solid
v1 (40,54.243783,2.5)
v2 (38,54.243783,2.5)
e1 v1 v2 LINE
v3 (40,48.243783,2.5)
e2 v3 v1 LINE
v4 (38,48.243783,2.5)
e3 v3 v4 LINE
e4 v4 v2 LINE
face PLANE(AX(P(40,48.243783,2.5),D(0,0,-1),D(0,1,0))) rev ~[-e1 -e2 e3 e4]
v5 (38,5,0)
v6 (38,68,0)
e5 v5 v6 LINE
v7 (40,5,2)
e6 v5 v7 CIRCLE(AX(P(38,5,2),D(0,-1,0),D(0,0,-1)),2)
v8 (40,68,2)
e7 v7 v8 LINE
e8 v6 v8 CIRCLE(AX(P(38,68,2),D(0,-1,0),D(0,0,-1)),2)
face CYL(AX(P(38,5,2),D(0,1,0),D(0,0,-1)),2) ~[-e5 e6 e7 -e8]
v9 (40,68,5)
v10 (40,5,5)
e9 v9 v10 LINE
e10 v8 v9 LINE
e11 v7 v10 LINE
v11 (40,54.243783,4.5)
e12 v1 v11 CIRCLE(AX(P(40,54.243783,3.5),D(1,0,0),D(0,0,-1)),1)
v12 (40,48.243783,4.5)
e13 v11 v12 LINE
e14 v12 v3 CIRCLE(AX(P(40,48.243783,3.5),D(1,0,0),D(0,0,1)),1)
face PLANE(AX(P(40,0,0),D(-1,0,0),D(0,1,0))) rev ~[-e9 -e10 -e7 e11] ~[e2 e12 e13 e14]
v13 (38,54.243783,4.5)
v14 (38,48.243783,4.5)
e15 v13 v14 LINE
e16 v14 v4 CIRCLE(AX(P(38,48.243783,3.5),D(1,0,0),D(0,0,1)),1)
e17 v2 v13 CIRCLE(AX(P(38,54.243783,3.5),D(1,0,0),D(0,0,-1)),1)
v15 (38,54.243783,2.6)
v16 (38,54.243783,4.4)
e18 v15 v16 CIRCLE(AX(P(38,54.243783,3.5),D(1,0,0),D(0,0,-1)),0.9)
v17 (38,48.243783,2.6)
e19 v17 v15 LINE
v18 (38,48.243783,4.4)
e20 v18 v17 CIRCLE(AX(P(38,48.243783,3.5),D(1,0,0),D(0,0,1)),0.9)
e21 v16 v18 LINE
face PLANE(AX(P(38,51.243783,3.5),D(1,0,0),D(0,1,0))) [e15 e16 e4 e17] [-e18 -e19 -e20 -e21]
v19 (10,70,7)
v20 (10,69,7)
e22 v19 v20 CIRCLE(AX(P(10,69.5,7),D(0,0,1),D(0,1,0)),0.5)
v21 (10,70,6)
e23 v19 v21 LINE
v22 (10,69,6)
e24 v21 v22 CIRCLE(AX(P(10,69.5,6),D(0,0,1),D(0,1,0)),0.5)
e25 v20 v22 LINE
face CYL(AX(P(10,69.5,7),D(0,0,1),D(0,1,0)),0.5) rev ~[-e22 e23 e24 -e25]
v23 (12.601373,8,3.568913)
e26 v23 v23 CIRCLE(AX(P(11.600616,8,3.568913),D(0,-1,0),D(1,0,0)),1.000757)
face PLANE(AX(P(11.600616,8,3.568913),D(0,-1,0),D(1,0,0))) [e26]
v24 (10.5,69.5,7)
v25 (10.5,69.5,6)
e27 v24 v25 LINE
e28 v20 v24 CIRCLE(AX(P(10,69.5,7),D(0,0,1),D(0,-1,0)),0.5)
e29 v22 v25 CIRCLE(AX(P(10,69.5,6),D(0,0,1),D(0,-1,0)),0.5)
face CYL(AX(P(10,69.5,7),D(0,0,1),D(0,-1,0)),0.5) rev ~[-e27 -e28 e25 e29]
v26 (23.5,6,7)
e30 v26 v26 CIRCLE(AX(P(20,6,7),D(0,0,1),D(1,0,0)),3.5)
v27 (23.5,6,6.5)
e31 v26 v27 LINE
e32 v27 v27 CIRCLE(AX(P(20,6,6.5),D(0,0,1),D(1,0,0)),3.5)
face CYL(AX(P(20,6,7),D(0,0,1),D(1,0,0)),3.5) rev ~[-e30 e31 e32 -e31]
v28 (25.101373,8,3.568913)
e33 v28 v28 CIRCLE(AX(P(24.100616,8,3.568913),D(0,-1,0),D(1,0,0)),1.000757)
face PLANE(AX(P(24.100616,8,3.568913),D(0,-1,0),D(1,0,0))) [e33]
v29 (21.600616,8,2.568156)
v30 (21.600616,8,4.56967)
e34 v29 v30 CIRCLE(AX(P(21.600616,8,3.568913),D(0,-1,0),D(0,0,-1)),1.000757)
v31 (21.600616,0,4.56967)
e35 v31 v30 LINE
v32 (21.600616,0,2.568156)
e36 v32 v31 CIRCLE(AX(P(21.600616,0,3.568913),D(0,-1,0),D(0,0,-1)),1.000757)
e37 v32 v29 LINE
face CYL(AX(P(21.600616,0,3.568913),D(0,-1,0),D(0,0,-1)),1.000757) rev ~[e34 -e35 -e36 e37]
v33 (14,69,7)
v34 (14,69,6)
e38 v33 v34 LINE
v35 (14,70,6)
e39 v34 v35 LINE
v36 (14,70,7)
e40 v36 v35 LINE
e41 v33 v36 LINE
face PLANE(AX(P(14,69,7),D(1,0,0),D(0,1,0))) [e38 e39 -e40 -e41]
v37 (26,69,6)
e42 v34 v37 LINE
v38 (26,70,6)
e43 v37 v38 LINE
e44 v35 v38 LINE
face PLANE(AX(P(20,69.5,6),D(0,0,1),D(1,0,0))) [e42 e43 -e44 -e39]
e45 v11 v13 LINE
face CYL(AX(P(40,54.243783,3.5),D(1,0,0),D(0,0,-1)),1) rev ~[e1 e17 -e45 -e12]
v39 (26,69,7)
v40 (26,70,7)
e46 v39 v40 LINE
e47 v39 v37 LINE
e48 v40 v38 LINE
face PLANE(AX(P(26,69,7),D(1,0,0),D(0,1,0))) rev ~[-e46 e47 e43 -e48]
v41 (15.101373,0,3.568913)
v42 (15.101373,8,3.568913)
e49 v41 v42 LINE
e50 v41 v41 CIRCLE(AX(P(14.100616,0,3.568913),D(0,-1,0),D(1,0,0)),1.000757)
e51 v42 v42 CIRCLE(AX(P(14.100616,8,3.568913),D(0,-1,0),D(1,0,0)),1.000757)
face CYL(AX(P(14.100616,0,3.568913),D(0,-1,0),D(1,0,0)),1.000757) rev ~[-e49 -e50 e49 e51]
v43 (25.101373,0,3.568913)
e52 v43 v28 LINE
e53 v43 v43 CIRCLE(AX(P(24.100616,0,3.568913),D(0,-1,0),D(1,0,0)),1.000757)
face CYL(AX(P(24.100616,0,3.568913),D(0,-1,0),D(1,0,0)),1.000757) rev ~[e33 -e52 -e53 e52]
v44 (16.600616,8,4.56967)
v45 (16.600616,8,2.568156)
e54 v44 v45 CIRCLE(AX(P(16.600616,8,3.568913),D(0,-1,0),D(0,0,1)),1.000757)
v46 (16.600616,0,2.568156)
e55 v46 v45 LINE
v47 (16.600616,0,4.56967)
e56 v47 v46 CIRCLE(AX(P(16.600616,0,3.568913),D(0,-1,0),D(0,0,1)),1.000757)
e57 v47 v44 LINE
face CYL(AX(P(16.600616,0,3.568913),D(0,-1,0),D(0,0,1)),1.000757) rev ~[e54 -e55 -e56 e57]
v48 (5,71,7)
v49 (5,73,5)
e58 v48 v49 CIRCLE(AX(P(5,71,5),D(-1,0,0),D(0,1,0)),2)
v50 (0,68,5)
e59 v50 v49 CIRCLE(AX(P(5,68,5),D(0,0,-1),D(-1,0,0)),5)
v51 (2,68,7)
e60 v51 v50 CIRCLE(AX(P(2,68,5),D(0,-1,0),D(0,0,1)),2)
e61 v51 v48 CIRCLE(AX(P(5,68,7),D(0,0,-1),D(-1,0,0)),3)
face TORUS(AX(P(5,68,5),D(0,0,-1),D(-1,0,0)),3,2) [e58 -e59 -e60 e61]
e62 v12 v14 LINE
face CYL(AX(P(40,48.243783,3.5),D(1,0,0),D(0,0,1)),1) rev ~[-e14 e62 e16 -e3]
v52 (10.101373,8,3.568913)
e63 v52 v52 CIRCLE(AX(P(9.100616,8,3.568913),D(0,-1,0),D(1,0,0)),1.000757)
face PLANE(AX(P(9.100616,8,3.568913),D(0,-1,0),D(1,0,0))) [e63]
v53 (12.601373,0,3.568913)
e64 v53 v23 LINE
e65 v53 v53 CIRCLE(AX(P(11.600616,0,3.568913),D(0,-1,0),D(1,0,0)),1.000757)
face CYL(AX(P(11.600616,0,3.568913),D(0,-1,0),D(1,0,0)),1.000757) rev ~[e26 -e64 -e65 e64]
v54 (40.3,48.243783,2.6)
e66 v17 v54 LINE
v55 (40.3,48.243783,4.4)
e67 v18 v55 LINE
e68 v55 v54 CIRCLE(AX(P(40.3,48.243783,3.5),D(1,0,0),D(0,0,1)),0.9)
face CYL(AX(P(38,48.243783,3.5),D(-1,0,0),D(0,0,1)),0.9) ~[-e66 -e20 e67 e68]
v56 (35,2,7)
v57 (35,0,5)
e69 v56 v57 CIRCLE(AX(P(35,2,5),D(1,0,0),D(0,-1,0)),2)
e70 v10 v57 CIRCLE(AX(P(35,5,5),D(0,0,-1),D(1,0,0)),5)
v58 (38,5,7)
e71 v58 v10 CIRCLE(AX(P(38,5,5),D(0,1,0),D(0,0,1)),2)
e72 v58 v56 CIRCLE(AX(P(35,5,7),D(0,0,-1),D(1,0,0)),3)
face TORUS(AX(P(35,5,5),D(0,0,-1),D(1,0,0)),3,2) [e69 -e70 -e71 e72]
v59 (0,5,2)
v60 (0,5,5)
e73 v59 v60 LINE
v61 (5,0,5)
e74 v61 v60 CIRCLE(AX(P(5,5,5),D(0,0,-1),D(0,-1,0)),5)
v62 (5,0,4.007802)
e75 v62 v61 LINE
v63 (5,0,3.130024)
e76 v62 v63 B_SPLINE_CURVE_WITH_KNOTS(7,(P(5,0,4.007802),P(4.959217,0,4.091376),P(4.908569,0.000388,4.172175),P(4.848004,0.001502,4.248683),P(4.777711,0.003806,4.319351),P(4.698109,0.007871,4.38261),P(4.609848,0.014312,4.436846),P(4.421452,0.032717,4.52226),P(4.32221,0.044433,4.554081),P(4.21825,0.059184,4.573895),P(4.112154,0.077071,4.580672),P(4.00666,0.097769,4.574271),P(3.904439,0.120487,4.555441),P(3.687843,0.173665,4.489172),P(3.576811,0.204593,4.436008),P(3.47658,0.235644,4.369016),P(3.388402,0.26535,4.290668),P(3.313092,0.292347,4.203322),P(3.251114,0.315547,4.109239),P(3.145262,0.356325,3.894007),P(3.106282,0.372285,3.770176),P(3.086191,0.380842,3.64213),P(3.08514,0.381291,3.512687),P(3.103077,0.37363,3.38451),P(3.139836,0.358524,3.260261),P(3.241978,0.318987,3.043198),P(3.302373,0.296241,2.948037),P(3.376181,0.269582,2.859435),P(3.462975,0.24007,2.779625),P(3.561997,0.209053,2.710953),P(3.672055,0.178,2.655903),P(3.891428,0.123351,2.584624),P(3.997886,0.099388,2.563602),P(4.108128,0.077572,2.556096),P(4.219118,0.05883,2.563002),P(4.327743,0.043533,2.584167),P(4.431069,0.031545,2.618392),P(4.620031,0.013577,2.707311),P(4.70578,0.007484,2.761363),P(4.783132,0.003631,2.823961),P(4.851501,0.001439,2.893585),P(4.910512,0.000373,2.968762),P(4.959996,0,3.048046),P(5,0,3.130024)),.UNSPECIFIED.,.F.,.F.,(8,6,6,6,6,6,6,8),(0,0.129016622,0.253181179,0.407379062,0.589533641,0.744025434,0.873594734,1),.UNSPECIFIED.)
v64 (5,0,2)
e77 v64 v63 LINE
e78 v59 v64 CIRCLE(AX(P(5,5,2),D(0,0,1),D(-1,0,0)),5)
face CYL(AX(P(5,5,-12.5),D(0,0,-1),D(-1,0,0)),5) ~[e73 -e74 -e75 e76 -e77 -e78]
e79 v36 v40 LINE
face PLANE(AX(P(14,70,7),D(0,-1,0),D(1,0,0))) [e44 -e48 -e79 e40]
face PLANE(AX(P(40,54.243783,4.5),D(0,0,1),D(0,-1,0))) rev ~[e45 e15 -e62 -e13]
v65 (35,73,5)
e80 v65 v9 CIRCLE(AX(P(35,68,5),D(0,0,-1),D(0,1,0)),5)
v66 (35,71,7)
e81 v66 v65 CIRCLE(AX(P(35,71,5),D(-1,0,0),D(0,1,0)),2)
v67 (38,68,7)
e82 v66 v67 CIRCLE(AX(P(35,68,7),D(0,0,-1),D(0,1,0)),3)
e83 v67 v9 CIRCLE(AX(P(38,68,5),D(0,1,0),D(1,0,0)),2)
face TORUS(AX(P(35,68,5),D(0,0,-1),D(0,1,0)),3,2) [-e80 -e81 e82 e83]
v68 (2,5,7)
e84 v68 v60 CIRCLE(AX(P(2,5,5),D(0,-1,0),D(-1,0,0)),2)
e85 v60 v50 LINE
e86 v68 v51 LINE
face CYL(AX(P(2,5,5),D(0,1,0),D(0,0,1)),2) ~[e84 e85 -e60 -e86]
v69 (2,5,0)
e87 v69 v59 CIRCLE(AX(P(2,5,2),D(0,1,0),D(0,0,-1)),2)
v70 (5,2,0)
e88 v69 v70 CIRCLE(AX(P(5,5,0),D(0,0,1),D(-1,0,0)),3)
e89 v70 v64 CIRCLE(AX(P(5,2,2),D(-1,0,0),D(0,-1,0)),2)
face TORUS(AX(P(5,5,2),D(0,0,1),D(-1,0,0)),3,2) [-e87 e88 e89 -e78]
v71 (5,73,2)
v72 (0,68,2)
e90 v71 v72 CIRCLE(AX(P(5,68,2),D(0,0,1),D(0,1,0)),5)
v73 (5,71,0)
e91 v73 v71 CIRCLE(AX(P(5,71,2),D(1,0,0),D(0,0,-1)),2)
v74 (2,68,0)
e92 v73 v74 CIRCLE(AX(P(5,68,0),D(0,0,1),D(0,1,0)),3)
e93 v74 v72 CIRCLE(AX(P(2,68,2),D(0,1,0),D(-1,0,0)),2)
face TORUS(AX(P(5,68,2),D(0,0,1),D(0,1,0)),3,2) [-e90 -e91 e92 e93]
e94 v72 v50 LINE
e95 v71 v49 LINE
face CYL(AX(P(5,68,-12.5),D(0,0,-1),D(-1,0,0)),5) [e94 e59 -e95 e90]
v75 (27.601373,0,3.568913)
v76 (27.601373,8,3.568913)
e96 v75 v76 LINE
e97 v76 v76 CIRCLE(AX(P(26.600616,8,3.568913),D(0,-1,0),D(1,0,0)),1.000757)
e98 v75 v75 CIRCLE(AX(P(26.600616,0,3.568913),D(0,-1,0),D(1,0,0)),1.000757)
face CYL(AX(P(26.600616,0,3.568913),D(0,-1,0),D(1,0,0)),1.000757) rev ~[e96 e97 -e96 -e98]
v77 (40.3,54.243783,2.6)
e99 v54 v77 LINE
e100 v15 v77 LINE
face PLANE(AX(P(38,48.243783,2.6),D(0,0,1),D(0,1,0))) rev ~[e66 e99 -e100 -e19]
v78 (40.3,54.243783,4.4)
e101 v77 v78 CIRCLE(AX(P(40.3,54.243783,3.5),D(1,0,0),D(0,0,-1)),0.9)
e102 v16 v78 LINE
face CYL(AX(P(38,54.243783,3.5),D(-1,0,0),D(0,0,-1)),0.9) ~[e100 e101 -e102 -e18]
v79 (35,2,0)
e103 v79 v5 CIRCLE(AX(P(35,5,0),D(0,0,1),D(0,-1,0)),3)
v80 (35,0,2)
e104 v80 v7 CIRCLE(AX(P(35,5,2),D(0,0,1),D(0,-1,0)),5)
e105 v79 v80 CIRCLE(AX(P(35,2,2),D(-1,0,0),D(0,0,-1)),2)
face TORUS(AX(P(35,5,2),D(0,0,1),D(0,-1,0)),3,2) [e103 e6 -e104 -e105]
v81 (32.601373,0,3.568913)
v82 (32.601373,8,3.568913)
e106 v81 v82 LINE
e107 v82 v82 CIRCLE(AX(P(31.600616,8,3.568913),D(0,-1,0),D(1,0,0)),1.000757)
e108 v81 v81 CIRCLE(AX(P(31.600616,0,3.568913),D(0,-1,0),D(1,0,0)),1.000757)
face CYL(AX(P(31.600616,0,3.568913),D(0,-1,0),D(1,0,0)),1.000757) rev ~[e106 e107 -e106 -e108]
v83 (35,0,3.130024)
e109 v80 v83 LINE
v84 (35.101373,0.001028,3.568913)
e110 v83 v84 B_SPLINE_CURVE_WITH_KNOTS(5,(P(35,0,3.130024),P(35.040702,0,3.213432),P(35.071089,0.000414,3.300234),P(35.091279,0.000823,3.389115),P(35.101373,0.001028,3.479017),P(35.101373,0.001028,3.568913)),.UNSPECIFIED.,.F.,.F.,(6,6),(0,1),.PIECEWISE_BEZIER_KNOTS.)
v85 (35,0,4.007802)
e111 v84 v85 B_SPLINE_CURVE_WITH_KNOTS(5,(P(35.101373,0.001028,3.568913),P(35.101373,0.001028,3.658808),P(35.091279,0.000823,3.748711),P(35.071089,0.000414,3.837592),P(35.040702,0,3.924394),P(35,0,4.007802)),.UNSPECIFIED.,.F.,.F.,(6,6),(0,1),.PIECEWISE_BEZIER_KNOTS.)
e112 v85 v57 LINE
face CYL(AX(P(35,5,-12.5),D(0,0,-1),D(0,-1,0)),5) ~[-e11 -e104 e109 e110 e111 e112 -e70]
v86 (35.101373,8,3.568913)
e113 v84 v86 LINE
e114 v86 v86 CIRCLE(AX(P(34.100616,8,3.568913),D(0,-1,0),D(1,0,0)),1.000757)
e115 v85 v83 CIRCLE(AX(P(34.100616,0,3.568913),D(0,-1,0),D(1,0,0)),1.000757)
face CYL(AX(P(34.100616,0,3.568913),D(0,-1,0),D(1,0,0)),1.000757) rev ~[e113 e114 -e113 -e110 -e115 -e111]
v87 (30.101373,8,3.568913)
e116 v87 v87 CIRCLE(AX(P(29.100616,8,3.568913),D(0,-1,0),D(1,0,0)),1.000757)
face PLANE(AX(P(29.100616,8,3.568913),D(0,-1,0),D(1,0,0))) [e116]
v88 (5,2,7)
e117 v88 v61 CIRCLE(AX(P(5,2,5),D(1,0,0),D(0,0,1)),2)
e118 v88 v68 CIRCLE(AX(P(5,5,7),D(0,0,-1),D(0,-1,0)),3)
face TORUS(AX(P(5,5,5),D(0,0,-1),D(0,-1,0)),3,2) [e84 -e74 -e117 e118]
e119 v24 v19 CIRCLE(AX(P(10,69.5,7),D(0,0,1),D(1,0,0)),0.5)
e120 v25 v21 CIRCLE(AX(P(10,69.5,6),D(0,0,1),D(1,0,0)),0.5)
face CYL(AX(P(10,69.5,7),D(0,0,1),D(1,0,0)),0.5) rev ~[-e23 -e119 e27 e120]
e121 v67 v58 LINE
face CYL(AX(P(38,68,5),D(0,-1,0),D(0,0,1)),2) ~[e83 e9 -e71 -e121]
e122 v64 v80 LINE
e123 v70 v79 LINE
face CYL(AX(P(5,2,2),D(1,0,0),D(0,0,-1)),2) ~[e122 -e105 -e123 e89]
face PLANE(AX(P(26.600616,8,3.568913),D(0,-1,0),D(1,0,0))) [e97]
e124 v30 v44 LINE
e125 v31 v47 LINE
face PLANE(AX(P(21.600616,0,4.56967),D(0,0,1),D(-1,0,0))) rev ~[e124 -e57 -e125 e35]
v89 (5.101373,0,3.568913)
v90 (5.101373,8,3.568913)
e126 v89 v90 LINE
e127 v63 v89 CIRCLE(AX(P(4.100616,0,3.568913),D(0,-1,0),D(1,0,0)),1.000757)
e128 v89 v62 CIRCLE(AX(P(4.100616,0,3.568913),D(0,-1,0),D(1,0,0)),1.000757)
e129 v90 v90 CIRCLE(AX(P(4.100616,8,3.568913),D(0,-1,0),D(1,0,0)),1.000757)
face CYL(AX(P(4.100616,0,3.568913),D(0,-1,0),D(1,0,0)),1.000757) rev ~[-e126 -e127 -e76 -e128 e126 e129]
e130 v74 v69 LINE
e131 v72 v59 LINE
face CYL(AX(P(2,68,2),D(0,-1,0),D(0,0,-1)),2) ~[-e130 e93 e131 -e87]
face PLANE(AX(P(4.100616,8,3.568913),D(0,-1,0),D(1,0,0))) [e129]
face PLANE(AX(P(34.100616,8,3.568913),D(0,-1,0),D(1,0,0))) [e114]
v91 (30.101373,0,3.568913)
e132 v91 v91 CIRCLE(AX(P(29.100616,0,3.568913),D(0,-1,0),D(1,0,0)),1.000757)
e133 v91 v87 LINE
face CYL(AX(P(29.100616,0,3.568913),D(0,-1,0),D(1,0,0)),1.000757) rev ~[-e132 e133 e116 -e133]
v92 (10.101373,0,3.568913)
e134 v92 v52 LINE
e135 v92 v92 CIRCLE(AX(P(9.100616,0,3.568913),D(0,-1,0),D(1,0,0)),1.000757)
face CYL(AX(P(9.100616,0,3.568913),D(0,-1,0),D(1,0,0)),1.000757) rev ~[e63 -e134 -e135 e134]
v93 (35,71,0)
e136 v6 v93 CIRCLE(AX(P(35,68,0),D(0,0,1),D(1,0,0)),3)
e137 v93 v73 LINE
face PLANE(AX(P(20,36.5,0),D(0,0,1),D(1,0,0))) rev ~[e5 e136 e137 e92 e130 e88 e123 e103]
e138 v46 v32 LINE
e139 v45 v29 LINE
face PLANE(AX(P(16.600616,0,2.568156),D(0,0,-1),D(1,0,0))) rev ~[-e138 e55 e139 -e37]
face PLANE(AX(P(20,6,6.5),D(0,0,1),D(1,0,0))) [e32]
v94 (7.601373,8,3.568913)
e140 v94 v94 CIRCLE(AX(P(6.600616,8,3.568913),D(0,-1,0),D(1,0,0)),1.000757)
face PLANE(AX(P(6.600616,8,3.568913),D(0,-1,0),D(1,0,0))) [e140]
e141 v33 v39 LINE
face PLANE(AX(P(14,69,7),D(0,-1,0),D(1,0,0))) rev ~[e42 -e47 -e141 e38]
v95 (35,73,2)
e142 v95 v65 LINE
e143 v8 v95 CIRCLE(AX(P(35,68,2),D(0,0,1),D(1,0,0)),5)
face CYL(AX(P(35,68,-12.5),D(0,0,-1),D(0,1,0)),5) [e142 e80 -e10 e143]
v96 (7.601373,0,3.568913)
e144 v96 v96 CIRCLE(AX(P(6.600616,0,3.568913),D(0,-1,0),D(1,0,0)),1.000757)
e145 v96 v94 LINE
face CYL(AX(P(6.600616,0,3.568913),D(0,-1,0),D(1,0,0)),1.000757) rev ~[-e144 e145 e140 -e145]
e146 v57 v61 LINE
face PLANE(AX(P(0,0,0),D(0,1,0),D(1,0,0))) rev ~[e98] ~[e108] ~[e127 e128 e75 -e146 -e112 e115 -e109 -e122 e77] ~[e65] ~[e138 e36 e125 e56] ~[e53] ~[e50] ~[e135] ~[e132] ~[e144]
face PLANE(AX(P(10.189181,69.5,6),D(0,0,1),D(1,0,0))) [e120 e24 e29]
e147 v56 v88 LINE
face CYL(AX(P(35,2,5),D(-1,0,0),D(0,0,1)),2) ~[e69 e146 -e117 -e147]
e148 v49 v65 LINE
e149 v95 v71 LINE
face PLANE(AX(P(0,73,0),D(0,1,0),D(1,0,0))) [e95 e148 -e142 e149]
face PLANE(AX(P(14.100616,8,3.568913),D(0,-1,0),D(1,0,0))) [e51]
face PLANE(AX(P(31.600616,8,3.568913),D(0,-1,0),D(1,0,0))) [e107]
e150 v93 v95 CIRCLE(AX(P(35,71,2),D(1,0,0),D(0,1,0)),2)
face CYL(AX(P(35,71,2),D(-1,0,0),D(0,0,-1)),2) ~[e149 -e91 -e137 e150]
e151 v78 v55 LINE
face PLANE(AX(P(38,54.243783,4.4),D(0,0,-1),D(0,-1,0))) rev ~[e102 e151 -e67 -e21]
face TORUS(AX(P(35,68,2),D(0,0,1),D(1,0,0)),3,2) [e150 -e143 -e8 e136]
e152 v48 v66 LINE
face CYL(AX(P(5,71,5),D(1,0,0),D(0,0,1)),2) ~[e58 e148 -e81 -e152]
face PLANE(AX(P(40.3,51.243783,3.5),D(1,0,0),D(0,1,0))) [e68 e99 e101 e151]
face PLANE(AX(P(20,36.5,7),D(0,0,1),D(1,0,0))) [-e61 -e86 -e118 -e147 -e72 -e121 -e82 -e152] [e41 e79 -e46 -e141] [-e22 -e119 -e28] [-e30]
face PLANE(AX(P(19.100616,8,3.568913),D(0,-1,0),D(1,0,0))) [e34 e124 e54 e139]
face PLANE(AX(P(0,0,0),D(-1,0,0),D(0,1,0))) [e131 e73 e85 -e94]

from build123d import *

# Parameters (mm, degrees)
F0_W         = 40
F0_H         = 73
F1_DEPTH     = 7
F3_R         = 1.0007571232
F4_DEPTH     = 8
F6_DEPTH     = 2
F8_DEPTH     = 2.3
F9_R         = 3.5
F10_DEPTH    = 0.5
F11_W        = 12
F11_H        = 1
F12_DEPTH    = 1
F13_T1_DEPTH = 32
F14_R        = 2
F15_R        = 2


# Not quite as in the source:
# - a fillet or chamfer that OpenCascade refuses, or shapes differently, is made with other operations: its cross-section is extruded or revolved along the edge and cut away or added


with BuildPart() as f1:
    # F0 (on Top) → F1 (new body)
    with BuildSketch(Plane.XY):
        with Locations((20, 36.5)):
            Rectangle(F0_W, F0_H)
    extrude(amount=F1_DEPTH)

    # F3 (on face) → F4 (cut)
    with BuildSketch(Plane.XZ):
        with Locations((4.10061609, 3.5689128563)):
            Circle(F3_R)
        with Locations((6.60061609, 3.5689128563)):
            Circle(F3_R)
        with Locations((9.10061609, 3.5689128563)):
            Circle(F3_R)
        with Locations((11.60061609, 3.5689128563)):
            Circle(F3_R)
        with Locations((14.10061609, 3.5689128563)):
            Circle(F3_R)
        with BuildLine():
            Line((21.60061609, 4.5696699795), (16.60061609, 4.5696699795))
            ThreePointArc((16.60061609, 4.5696699795), (15.5998589668, 3.5689128563), (16.60061609, 2.568155733))
            Line((16.60061609, 2.568155733), (21.60061609, 2.568155733))
            ThreePointArc((21.60061609, 2.568155733), (22.6013732132, 3.5689128563), (21.60061609, 4.5696699795))
        make_face()
        with Locations((24.10061609, 3.5689128563)):
            Circle(F3_R)
        with Locations((26.60061609, 3.5689128563)):
            Circle(F3_R)
        with Locations((29.10061609, 3.5689128563)):
            Circle(F3_R)
        with Locations((31.60061609, 3.5689128563)):
            Circle(F3_R)
        with Locations((34.10061609, 3.5689128563)):
            Circle(F3_R)
    extrude(amount=-F4_DEPTH, mode=Mode.SUBTRACT)

    # F5 (on face) → F6 (cut)
    with BuildSketch(Plane.YZ.offset(40)):
        with BuildLine():
            Line((54.2437834144, 4.5), (48.2437834144, 4.5))
            ThreePointArc((48.2437834144, 4.5), (47.2437834144, 3.5), (48.2437834144, 2.5))
            Line((48.2437834144, 2.5), (54.2437834144, 2.5))
            ThreePointArc((54.2437834144, 2.5), (55.2437834144, 3.5), (54.2437834144, 4.5))
        make_face()
    extrude(amount=-F6_DEPTH, mode=Mode.SUBTRACT)

    # F7 (on face) → F8 (join)
    with BuildSketch(Plane.YZ.offset(38)):
        with BuildLine():
            Line((54.2437834144, 4.4), (48.2437834144, 4.4))
            ThreePointArc((48.2437834144, 4.4), (47.3437834144, 3.5), (48.2437834144, 2.6))
            Line((48.2437834144, 2.6), (54.2437834144, 2.6))
            ThreePointArc((54.2437834144, 2.6), (55.1437834144, 3.5), (54.2437834144, 4.4))
        make_face()
    extrude(amount=F8_DEPTH)

    # F9 (on face) → F10 (cut)
    with BuildSketch(Plane.XY.offset(7)):
        with Locations((20, 6)):
            Circle(F9_R)
    extrude(amount=-F10_DEPTH, mode=Mode.SUBTRACT)

    # F11 (on face) → F12 (cut)
    with BuildSketch(Plane.XY.offset(7)):
        with Locations((20, 69.5)):
            Rectangle(F11_W, F11_H)
        with BuildLine():
            ThreePointArc((10.5, 69.5), (10.3535533906, 69.8535533906), (10, 70))
            Line((10, 70), (10, 69))
            ThreePointArc((10, 69), (10.3535533906, 69.1464466094), (10.5, 69.5))
        make_face()
        with BuildLine():
            Line((10, 69), (10, 70))
            ThreePointArc((10, 70), (9.5, 69.5), (10, 69))
        make_face()
    extrude(amount=-F12_DEPTH, mode=Mode.SUBTRACT)

    # F13: fillet of radius 5 on 4 edges, made by hand

    # F13_s2 → F13_t1 (cut)
    with BuildSketch(Plane.XY.offset(-12.5)):
        with BuildLine():
            ThreePointArc((35, 0), (38.5355339059, 1.4644660941), (40, 5))
            Line((40, 5), (40, 0))
            Line((40, 0), (35, 0))
        make_face()
        with BuildLine():
            ThreePointArc((0, 5), (1.4644660941, 1.4644660941), (5, 0))
            Line((5, 0), (0, 0))
            Line((0, 0), (0, 5))
        make_face()
        with BuildLine():
            ThreePointArc((35, 73), (38.5355339059, 71.5355339059), (40, 68))
            Line((40, 68), (40, 73))
            Line((40, 73), (35, 73))
        make_face()
        with BuildLine():
            ThreePointArc((0, 68), (1.4644660941, 71.5355339059), (5, 73))
            Line((5, 73), (0, 73))
            Line((0, 73), (0, 68))
        make_face()
    extrude(amount=F13_T1_DEPTH, mode=Mode.SUBTRACT)

    # F14
    f14_edges = [f1.edges().sort_by_distance(p)[0] for p in [
        (38.535534, 71.535534, 7),
        (20, 73, 7),
        (1.464466, 71.535534, 7),
        (0, 36.5, 7),
        (1.464466, 1.464466, 7),
        (20, 0, 7),
        (38.535534, 1.464466, 7),
        (40, 36.5, 7),
    ]]
    fillet(f14_edges, radius=F14_R)

    # F15
    f15_edges = [f1.edges().sort_by_distance(p)[0] for p in [
        (40, 36.5, 0),
        (38.535534, 71.535534, 0),
        (20, 73, 0),
        (1.464466, 71.535534, 0),
        (0, 36.5, 0),
        (38.535534, 1.464466, 0),
        (20, 0, 0),
        (1.464466, 1.464466, 0),
    ]]
    fillet(f15_edges, radius=F15_R)


solid = f1.part
